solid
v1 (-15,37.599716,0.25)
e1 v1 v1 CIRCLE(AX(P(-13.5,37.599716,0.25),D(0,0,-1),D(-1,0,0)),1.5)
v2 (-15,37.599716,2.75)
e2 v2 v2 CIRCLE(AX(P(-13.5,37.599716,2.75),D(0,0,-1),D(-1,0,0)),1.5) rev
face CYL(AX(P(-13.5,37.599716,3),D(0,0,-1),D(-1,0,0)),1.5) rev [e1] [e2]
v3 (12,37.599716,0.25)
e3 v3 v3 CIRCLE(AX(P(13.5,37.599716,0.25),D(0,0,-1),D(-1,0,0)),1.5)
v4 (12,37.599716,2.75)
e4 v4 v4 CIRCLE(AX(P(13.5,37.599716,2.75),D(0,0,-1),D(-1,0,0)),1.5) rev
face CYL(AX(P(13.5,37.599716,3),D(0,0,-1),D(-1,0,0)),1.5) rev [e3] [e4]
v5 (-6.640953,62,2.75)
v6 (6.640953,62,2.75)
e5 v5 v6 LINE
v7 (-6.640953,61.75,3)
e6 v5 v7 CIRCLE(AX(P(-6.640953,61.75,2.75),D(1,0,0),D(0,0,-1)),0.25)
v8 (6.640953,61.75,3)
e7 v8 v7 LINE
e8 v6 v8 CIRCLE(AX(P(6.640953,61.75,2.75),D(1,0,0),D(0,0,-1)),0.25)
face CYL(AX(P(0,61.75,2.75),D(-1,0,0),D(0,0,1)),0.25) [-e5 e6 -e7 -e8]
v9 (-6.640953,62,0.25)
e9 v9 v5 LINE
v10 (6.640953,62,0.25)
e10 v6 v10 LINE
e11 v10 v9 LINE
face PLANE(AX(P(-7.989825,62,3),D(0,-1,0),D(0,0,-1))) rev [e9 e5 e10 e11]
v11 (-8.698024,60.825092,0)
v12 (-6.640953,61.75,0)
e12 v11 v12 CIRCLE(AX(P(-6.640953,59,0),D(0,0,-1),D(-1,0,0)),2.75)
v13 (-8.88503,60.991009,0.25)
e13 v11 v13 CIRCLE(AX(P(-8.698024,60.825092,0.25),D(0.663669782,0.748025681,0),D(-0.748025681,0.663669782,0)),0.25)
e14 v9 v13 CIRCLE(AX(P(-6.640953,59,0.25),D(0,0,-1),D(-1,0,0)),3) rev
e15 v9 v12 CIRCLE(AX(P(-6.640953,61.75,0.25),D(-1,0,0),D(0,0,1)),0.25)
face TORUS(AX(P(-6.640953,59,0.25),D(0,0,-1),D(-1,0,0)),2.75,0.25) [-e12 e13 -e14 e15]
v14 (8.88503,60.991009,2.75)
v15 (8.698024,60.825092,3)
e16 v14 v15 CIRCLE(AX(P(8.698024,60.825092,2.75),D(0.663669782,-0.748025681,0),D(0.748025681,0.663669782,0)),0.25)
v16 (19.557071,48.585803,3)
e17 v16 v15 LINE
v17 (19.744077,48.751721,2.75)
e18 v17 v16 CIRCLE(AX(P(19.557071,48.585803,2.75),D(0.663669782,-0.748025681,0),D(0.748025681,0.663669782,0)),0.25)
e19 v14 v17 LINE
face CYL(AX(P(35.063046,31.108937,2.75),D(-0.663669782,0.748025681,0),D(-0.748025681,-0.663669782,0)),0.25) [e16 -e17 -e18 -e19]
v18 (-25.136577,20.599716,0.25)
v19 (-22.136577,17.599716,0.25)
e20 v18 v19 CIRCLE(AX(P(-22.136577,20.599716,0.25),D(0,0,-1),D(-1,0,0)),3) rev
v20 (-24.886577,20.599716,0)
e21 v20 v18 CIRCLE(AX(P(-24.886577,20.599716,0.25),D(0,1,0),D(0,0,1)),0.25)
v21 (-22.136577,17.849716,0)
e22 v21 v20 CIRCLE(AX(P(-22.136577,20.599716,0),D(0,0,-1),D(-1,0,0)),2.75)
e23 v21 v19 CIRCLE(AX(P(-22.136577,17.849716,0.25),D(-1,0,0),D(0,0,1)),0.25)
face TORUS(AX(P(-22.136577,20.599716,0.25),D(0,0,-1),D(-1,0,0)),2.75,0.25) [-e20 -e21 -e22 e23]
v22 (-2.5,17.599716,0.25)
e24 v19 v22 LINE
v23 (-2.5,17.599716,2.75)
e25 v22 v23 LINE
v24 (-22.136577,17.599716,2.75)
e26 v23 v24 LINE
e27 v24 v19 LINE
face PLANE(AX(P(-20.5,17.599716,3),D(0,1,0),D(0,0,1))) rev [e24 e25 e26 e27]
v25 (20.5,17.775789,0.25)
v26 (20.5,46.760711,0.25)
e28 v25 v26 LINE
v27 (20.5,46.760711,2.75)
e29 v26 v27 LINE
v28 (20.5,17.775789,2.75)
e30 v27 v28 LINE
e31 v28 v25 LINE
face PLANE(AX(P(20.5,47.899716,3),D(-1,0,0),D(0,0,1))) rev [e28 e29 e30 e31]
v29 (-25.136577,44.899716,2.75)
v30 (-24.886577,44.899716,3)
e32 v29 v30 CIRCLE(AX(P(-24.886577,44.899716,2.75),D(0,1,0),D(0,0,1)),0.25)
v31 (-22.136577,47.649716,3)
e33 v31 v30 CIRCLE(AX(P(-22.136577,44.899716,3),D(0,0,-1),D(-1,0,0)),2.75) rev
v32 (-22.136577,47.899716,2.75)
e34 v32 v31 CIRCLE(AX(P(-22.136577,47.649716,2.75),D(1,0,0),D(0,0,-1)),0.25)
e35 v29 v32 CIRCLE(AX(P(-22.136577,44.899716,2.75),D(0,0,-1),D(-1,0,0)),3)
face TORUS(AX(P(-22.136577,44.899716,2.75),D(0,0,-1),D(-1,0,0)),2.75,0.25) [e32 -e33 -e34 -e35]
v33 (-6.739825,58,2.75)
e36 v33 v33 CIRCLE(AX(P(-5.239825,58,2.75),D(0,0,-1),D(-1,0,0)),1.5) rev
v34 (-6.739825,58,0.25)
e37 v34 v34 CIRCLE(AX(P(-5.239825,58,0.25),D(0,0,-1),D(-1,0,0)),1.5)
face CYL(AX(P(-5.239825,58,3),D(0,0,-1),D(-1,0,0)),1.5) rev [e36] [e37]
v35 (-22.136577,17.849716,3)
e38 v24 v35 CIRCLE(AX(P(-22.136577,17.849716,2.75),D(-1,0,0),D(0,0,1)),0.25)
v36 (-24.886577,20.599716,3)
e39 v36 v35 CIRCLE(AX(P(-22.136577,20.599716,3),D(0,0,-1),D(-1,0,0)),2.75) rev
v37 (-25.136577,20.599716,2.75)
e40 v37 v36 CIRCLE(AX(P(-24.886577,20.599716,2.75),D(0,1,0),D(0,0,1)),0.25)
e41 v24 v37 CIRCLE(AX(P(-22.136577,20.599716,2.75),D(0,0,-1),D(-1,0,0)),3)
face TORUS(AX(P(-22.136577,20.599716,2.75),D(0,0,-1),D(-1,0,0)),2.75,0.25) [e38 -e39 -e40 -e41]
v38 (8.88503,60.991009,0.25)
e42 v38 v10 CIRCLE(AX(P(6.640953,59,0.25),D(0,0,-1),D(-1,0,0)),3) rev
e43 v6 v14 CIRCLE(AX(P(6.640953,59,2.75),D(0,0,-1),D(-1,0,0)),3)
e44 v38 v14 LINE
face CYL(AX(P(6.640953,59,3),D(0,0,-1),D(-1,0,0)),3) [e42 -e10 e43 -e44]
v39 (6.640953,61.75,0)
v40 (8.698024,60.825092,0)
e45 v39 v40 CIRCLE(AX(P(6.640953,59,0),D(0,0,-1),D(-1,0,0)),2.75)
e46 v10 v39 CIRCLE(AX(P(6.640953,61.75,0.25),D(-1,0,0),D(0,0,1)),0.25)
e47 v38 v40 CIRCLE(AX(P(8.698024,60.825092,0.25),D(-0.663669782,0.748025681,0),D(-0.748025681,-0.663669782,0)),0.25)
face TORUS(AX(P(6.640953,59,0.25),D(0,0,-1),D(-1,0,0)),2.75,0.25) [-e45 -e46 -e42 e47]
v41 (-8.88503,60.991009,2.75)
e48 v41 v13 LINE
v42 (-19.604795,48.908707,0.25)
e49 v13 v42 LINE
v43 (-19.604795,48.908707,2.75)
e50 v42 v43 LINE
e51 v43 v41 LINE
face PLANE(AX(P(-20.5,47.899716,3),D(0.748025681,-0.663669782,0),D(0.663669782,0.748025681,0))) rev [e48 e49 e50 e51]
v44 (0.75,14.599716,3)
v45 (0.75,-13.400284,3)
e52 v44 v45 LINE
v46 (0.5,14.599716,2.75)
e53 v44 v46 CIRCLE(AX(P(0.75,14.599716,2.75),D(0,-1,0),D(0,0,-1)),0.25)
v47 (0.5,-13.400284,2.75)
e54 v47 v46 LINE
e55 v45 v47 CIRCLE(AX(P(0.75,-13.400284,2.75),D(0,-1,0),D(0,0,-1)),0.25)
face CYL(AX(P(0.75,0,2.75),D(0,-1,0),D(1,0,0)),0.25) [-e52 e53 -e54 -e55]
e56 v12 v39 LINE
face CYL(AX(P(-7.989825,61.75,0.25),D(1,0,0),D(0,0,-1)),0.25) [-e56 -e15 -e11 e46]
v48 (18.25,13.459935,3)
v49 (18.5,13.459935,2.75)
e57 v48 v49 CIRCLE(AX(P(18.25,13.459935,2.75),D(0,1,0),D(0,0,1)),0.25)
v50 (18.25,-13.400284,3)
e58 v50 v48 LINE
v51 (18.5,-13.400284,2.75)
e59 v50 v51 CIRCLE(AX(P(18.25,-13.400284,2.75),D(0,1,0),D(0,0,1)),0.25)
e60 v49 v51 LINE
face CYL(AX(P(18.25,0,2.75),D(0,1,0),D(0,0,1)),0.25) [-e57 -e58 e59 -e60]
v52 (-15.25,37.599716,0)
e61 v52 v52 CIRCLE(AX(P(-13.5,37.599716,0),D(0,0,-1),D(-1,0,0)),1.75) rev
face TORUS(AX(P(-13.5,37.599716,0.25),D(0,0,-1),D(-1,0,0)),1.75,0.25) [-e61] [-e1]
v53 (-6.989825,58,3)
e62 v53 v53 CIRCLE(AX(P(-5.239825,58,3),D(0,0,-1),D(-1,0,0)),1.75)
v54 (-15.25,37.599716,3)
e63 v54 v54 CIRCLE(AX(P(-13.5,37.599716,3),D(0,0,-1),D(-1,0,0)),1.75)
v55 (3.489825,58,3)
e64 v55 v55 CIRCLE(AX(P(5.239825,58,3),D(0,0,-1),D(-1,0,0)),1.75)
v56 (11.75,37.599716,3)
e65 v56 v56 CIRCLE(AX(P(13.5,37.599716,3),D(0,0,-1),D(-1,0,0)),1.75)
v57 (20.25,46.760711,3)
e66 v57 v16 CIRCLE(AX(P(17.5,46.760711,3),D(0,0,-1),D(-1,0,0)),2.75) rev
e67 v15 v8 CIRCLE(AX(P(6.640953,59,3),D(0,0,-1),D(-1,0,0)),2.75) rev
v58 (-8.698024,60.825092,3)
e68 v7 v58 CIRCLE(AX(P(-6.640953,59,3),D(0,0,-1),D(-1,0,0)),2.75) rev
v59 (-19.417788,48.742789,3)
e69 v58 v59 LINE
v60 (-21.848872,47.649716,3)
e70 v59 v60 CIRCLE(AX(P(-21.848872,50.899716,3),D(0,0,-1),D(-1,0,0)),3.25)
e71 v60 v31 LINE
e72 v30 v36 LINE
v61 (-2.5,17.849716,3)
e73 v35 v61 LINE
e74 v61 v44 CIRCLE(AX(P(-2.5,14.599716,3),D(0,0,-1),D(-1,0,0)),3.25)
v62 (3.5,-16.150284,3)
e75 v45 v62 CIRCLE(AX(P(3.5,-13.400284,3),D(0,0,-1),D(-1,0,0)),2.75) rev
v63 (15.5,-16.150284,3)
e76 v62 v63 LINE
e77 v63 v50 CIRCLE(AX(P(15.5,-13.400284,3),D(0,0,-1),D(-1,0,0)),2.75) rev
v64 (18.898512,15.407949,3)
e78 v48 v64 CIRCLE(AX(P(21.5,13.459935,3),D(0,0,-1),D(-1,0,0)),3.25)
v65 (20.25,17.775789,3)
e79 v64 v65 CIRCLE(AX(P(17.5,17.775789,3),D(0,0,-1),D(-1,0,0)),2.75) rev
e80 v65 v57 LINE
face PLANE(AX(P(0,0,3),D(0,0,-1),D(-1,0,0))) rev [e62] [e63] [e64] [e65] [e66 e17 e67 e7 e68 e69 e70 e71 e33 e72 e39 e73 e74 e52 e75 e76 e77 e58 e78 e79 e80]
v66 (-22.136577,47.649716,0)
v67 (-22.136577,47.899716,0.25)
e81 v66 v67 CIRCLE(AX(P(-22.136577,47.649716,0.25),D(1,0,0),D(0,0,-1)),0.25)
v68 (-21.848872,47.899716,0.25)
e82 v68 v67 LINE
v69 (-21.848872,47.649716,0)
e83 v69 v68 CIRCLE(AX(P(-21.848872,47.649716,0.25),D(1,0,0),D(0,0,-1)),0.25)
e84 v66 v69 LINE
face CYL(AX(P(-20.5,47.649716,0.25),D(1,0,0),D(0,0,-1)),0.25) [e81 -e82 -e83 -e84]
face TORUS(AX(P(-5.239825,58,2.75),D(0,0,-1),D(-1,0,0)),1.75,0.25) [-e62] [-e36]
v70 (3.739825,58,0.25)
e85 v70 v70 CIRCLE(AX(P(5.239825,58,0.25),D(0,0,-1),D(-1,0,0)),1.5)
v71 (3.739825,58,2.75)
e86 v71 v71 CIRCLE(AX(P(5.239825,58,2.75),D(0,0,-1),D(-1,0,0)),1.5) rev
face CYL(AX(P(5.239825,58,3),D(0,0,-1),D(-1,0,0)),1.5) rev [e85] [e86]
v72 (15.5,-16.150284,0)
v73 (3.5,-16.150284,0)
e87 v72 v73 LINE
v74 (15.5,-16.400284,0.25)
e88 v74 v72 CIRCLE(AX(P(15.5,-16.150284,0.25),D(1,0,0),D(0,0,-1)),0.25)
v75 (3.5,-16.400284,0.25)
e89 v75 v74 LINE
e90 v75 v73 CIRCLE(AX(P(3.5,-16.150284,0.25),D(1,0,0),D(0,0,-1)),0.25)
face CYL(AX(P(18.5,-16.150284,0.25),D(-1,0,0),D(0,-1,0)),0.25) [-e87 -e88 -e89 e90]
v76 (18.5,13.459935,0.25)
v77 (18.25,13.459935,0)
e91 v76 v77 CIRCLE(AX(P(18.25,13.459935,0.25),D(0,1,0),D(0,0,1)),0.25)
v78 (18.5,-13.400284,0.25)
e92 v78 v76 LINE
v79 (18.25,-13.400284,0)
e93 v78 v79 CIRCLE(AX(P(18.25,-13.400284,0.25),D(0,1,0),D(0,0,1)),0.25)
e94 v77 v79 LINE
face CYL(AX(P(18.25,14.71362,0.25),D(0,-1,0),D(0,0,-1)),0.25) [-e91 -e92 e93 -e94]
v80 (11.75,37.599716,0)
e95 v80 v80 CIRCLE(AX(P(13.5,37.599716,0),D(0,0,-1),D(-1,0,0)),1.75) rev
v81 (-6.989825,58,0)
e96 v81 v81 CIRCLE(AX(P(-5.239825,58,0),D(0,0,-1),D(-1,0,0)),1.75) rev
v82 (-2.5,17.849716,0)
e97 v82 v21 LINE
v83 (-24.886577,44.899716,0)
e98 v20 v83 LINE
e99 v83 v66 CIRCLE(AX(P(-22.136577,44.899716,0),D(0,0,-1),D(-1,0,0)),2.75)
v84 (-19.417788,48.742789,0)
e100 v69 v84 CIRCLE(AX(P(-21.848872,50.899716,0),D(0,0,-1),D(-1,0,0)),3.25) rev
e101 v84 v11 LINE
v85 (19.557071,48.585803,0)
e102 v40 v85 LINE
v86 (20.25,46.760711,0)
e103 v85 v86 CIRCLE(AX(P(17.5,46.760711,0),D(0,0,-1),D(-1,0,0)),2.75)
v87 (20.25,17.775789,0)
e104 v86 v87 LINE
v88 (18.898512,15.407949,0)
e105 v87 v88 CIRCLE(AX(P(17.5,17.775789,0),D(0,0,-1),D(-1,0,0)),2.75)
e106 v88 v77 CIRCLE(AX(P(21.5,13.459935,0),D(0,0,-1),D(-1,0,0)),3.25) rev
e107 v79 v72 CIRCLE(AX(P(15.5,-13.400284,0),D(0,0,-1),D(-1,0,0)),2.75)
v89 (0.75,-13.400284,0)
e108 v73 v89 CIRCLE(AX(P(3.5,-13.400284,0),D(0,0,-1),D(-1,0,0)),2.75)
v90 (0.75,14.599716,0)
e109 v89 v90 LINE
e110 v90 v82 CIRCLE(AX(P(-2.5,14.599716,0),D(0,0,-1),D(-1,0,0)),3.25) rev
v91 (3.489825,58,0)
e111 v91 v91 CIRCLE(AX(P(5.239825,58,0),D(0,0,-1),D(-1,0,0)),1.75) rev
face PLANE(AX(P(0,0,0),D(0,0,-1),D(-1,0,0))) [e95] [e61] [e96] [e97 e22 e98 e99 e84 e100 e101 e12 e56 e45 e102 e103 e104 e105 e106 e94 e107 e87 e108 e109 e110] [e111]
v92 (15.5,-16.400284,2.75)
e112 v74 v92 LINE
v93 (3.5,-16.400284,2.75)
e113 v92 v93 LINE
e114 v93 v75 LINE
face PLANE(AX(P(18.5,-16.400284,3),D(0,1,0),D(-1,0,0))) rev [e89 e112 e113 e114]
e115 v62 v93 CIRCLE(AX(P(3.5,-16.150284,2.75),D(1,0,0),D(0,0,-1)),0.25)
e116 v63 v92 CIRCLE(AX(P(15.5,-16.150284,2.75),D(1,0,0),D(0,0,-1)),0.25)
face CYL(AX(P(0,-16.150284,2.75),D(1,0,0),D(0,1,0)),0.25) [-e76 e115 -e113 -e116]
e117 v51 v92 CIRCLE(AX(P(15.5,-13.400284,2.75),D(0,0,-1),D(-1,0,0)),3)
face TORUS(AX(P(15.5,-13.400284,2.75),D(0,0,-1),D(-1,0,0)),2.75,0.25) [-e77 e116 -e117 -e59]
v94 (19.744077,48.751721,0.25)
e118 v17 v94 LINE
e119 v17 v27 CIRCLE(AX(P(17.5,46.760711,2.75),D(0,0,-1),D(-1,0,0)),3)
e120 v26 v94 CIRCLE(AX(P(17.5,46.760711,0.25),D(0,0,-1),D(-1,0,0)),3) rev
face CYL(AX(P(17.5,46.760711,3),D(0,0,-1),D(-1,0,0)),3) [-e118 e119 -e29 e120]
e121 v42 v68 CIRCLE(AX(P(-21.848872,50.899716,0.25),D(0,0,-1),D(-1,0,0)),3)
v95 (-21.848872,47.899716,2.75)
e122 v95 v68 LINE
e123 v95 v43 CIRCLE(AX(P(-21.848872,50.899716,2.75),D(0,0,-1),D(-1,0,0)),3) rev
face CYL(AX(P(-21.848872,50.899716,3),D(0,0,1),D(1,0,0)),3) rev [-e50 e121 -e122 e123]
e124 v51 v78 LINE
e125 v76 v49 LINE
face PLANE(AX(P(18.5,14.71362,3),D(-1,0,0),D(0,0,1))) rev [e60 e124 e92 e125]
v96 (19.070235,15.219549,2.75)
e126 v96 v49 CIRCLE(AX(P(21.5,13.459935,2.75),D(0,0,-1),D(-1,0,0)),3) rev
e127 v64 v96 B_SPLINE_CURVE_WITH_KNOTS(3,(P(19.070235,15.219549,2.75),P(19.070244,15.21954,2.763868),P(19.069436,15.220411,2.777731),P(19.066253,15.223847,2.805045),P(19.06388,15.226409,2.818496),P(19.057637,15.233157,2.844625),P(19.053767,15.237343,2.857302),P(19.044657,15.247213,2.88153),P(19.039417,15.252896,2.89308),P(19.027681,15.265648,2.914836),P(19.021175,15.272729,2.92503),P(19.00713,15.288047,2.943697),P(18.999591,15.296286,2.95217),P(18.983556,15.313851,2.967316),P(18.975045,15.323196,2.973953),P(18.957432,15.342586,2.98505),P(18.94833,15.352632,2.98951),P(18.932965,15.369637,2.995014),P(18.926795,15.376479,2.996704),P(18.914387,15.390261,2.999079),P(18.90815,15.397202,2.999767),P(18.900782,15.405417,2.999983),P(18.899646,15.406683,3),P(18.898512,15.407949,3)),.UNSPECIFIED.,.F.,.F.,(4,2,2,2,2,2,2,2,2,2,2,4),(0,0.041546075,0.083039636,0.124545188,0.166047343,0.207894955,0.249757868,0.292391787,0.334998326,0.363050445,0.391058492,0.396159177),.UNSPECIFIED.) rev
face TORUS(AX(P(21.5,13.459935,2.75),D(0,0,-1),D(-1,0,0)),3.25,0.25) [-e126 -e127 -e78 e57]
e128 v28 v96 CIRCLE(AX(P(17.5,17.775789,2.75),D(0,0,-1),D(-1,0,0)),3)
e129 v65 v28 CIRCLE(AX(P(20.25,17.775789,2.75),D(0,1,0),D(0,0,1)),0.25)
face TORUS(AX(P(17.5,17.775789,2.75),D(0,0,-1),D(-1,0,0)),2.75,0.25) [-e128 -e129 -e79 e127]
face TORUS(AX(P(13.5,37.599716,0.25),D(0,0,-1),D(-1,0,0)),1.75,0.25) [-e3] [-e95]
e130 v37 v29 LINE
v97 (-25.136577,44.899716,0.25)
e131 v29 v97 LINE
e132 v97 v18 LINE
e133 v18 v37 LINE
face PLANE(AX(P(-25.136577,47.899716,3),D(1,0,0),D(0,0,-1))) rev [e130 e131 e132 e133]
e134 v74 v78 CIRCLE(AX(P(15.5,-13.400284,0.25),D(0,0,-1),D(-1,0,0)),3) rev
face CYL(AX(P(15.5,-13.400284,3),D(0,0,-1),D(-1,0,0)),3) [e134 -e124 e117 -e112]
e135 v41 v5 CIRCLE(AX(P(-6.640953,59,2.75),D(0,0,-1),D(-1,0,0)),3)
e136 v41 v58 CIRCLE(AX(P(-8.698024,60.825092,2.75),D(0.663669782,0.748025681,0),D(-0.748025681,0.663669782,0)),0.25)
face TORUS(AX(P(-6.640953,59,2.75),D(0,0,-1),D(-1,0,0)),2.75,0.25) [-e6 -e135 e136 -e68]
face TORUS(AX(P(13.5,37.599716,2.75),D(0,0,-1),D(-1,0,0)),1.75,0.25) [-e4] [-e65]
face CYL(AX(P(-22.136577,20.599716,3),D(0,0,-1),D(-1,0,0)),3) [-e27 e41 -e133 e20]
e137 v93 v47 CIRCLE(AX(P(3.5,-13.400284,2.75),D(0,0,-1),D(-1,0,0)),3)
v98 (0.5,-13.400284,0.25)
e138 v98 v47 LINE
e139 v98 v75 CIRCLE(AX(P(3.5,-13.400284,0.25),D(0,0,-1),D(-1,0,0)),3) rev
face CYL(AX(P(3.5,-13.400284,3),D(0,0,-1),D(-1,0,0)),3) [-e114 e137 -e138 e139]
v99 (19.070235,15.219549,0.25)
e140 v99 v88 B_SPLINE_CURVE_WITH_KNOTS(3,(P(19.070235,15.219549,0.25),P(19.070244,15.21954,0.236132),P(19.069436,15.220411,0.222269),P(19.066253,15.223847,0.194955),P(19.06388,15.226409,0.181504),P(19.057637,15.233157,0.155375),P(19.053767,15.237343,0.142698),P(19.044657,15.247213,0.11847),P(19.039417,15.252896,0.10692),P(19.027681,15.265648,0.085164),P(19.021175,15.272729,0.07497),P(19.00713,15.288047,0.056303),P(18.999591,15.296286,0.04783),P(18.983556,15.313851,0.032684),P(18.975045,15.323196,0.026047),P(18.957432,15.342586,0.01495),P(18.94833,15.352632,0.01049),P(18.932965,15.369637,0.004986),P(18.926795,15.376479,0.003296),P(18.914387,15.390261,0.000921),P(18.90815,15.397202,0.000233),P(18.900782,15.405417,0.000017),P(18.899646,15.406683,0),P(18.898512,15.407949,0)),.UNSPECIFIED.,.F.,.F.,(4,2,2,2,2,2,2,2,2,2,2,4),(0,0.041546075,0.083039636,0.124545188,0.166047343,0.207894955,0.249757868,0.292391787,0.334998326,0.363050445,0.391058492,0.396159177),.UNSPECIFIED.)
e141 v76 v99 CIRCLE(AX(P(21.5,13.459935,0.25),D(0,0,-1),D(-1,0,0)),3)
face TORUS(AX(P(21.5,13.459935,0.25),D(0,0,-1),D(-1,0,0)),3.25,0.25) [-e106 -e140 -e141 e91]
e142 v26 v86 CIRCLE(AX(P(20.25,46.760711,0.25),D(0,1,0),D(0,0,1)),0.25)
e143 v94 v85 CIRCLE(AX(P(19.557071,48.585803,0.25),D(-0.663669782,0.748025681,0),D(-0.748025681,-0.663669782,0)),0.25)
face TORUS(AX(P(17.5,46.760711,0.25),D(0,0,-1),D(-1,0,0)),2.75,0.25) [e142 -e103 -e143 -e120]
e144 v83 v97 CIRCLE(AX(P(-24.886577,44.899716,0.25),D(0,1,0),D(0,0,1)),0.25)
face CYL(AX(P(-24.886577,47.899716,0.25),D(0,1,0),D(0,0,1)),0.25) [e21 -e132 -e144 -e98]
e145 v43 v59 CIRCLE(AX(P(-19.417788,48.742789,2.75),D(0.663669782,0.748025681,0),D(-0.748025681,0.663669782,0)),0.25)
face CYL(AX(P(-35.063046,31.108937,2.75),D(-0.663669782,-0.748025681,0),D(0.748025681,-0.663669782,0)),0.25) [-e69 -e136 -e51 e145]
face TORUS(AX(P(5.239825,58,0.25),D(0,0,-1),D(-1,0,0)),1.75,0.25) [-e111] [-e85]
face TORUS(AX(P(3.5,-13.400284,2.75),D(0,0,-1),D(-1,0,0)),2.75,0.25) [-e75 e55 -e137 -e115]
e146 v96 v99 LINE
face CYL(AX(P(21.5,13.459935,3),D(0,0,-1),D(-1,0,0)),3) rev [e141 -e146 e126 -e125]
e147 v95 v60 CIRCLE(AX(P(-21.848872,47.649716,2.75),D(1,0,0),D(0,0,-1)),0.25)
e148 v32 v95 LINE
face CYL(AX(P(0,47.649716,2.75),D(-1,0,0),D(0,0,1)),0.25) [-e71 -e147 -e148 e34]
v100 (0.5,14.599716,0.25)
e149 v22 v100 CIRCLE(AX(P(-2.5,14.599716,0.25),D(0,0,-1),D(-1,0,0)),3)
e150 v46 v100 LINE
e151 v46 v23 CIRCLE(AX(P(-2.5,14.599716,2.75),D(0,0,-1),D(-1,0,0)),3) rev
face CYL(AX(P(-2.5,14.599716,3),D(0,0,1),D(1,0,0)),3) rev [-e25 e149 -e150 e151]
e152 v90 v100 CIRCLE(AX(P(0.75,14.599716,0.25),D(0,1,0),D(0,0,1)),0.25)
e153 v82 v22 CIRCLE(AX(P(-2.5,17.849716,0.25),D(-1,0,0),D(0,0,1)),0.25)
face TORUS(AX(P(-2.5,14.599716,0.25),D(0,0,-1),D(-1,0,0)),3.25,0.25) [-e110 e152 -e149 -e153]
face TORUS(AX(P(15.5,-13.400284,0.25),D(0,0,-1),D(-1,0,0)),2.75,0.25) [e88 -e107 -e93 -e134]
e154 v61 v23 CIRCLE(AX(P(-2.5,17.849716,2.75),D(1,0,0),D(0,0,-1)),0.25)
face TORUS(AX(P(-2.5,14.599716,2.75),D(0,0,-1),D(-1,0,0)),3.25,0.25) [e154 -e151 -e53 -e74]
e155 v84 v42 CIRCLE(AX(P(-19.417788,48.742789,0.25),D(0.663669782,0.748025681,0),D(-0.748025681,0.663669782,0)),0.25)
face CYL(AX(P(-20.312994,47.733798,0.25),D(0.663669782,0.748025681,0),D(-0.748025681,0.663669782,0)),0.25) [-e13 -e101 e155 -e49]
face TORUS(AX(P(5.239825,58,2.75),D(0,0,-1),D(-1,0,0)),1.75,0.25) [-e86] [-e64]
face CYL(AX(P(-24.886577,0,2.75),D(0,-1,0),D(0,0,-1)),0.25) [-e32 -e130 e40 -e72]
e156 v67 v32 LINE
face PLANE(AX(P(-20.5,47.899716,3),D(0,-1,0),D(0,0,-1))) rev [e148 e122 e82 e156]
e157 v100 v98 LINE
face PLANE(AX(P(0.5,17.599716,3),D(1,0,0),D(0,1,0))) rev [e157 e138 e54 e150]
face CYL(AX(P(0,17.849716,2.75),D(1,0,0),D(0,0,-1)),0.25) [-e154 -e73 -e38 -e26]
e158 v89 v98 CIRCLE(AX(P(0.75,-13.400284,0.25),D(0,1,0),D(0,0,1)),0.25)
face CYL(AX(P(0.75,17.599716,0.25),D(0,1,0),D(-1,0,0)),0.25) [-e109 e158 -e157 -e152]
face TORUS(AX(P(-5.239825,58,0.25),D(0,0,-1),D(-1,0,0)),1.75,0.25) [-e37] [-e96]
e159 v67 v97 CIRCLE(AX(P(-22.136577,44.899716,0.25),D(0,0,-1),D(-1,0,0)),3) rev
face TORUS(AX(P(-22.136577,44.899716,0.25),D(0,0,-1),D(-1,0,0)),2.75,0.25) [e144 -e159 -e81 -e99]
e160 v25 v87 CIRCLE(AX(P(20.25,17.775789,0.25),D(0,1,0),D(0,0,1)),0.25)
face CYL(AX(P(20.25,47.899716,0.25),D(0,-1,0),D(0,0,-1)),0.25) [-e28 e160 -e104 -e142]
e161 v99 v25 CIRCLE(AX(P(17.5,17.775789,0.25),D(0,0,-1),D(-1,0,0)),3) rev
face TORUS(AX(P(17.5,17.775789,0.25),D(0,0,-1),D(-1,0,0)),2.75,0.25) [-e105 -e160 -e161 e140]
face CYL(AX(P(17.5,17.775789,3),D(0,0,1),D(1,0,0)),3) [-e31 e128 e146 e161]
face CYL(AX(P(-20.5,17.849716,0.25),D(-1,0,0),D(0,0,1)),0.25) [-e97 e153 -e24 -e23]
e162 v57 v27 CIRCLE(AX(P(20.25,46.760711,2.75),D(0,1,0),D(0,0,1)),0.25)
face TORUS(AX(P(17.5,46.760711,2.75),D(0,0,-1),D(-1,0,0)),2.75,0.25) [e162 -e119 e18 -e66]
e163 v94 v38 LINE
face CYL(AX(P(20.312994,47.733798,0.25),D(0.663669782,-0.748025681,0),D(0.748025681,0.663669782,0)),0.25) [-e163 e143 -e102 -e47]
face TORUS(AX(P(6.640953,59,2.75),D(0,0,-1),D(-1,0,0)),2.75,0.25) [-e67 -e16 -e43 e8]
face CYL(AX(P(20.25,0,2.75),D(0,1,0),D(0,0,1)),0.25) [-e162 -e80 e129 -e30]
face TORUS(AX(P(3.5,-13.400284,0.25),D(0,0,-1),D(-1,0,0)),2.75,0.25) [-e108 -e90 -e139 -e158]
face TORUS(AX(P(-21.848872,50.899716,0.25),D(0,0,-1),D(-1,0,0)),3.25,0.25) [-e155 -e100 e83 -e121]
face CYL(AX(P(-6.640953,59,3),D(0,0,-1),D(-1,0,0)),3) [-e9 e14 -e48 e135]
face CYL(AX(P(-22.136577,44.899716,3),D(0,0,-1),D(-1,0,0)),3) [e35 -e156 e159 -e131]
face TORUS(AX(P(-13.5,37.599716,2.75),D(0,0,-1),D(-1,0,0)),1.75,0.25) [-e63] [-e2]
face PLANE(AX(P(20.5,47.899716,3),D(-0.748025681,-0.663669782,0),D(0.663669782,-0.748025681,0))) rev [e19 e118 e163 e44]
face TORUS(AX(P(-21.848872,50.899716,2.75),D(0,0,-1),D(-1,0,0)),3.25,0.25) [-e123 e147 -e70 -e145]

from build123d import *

# Parameters (mm, degrees)
SKETCH1_R           = 1.5
BOSS_EXTRUDE1_DEPTH = 3
FILLET1_R           = 3
FILLET2_R           = 0.25


with BuildPart() as part:
    # Sketch1 → Boss-Extrude1 (new body)
    with BuildSketch(Plane.XY):
        Polygon((-20.5, 47.899715907), (-7.989824602, 62), (7.989824602, 62), (20.5, 47.899715907), (20.5, 15.219549054), (19.070234775, 15.219549054), (18.5, 14.713620449), (18.5, -16.400284093), (0.5, -16.400284093), (0.5, 17.599715907), (-20.5, 17.599715907), (-25.136576575, 17.599715907), (-25.136576575, 47.899715907), align=None)
        with Locations((-5.239824602, 58)):
            Circle(SKETCH1_R, mode=Mode.SUBTRACT)
        with Locations((-13.5, 37.599715907)):
            Circle(SKETCH1_R, mode=Mode.SUBTRACT)
        with Locations(Location((13.5, 37.599715907, 0), (0, 0, 180))):
            Circle(SKETCH1_R, mode=Mode.SUBTRACT)
        with Locations(Location((5.239824602, 58, 0), (0, 0, 180))):
            Circle(SKETCH1_R, mode=Mode.SUBTRACT)
    extrude(amount=BOSS_EXTRUDE1_DEPTH)

    # Fillet1
    # the kernel refuses this fillet: 3 mm, written as the material it adds along each edge
    with BuildSketch(Plane(origin=(0.5, 17.599715907, 0), x_dir=(-1, 0, 0), z_dir=(0, 0, 1))) as fillet1_piece_1:
        with BuildLine():
            CenterArc((FILLET1_R, FILLET1_R), FILLET1_R, 180, 90)
            Line((0, FILLET1_R), (-FILLET1_R * 0.02, FILLET1_R))
            Line((-FILLET1_R * 0.02, FILLET1_R), (-FILLET1_R * 0.02, -FILLET1_R * 0.02))
            Line((-FILLET1_R * 0.02, -FILLET1_R * 0.02), (FILLET1_R, -FILLET1_R * 0.02))
            Line((FILLET1_R, -FILLET1_R * 0.02), (FILLET1_R, 0))
        make_face()
    extrude(amount=3)
    with BuildSketch(Plane(origin=(-20.5, 47.899715907, 0), x_dir=(0.6636697823920836, 0.7480256813369742, 0), z_dir=(0, 0, 1))) as fillet1_piece_2:
        with BuildLine():
            CenterArc((FILLET1_R * 0.449623891264, FILLET1_R), FILLET1_R, 221.580355478, 48.419644522)
            Line((-FILLET1_R * 0.298401790073, FILLET1_R * 0.336330217608), (-FILLET1_R * 0.3133623037, FILLET1_R * 0.32305682196))
            Line((-FILLET1_R * 0.3133623037, FILLET1_R * 0.32305682196), (-FILLET1_R * 0.00899247782528, -FILLET1_R * 0.02))
            Line((-FILLET1_R * 0.00899247782528, -FILLET1_R * 0.02), (FILLET1_R * 0.449623891264, -FILLET1_R * 0.02))
            Line((FILLET1_R * 0.449623891264, -FILLET1_R * 0.02), (FILLET1_R * 0.449623891264, 0))
        make_face()
    extrude(amount=3)
    with BuildSketch(Plane(origin=(18.5, 14.713620449, 0), x_dir=(0, -1, 0), z_dir=(0, 0, 1))) as fillet1_piece_3:
        with BuildLine():
            CenterArc((1.25368526, 3), FILLET1_R, 234.088286061, 35.911713939)
            Line((-0.505928605, 0.570234775), (-0.541120882, 0.521639471))
            ThreePointArc((-0.541120882, 0.521639471), (-0.297845843, 0.245297201), (-0.044881541, -0.039820187))
            Line((-0.044881541, -0.039820187), (0, -0.06))
            Line((0, -0.06), (1.25368526, -0.06))
            Line((1.25368526, -0.06), (1.25368526, 0))
        make_face()
    extrude(amount=3)
    # the kernel refuses this fillet: 3 mm, written as the material it takes off along each edge
    with BuildSketch(Plane(origin=(-7.989824602, 62, -3.372179184), x_dir=(1, 0, 0), z_dir=(0, 0, 1)), Plane(origin=(7.989824602, 62, -3.372179184), x_dir=(0.6636697823920855, -0.7480256813369726, 0), z_dir=(0, 0, 1))) as fillet1_2_piece_1:
        with BuildLine():
            CenterArc((FILLET1_R * 0.449623891264, -FILLET1_R), FILLET1_R, 90, 48.419644522)
            Line((-FILLET1_R * 0.298401790073, -FILLET1_R * 0.336330217608), (-FILLET1_R * 0.3133623037, -FILLET1_R * 0.32305682196))
            Line((-FILLET1_R * 0.3133623037, -FILLET1_R * 0.32305682196), (-FILLET1_R * 0.00899247782527, FILLET1_R * 0.02))
            Line((-FILLET1_R * 0.00899247782527, FILLET1_R * 0.02), (FILLET1_R * 0.449623891264, FILLET1_R * 0.02))
            Line((FILLET1_R * 0.449623891264, FILLET1_R * 0.02), (FILLET1_R * 0.449623891264, 0))
        make_face()
    extrude(amount=9.744358369, mode=Mode.SUBTRACT)
    with BuildSketch(Plane(origin=(18.5, -16.400284093, -7.5), x_dir=(-1, 0, 0), z_dir=(0, 0, 1)), Plane(origin=(0.5, -16.400284093, -7.5), x_dir=(0, 1, 0), z_dir=(0, 0, 1)), Plane(origin=(-25.136576575, 17.599715907, -7.5), x_dir=(0, 1, 0), z_dir=(0, 0, 1)), Plane(origin=(-25.136576575, 47.899715907, -7.5), x_dir=(1, 0, 0), z_dir=(0, 0, 1))) as fillet1_2_piece_2:
        with BuildLine():
            CenterArc((FILLET1_R, -FILLET1_R), FILLET1_R, 90, 90)
            Line((0, -FILLET1_R), (-FILLET1_R * 0.02, -FILLET1_R))
            Line((-FILLET1_R * 0.02, -FILLET1_R), (-FILLET1_R * 0.02, FILLET1_R * 0.02))
            Line((-FILLET1_R * 0.02, FILLET1_R * 0.02), (FILLET1_R, FILLET1_R * 0.02))
            Line((FILLET1_R, FILLET1_R * 0.02), (FILLET1_R, 0))
        make_face()
    extrude(amount=18, mode=Mode.SUBTRACT)
    with BuildSketch(Plane(origin=(20.5, 47.899715907, -2.847511579), x_dir=(0, -1, 0), z_dir=(0, 0, 1))) as fillet1_2_piece_3:
        with BuildLine():
            CenterArc((FILLET1_R * 0.379668210529, -FILLET1_R), FILLET1_R, 90, 41.580355478)
            Line((-FILLET1_R * 0.284001571863, -FILLET1_R * 0.251974318663), (-FILLET1_R * 0.297274967511, -FILLET1_R * 0.237013805036))
            Line((-FILLET1_R * 0.297274967511, -FILLET1_R * 0.237013805036), (-FILLET1_R * 0.00759336421058, FILLET1_R * 0.02))
            Line((-FILLET1_R * 0.00759336421058, FILLET1_R * 0.02), (FILLET1_R * 0.379668210529, FILLET1_R * 0.02))
            Line((FILLET1_R * 0.379668210529, FILLET1_R * 0.02), (FILLET1_R * 0.379668210529, 0))
        make_face()
    extrude(amount=8.695023158, mode=Mode.SUBTRACT)
    with BuildSketch(Plane(origin=(20.5, 15.219549054, -6.390599908), x_dir=(-1, 0, 0), z_dir=(0, 0, 1))) as fillet1_2_piece_4:
        with BuildLine():
            CenterArc((3, -2.556239963), FILLET1_R, 121.561373817, 58.438626183)
            Line((0, -2.556239963), (-0.06, -2.556239963))
            Line((-0.06, -2.556239963), (-0.06, 0))
            Line((-0.06, 0), (0, 0.06))
            ThreePointArc((0, 0.06), (0.714882612, 0.06), (1.398360529, 0.051124799))
            Line((1.398360529, 0.051124799), (1.429765225, 0))
        make_face()
    extrude(amount=15.781199817, mode=Mode.SUBTRACT)

    # Fillet2
    fillet2_edges = [part.edges().sort_by_distance(p)[0] for p in [
        (-6.739824602, 58, 0),
        (-6.739824602, 58, 3),
        (-15, 37.599715907, 0),
        (-15, 37.599715907, 3),
        (15, 37.599715907, 0),
        (15, 37.599715907, 3),
        (6.739824602, 58, 0),
        (6.739824602, 58, 3),
        (0, 62, 0),
        (0, 62, 3),
        (18.5, 0.029825548, 0),
        (9.5, -16.400284093, 0),
        (0.5, 0.599715907, 0),
        (-12.318288288, 17.599715907, 0),
        (-25.136576575, 32.749715907, 0),
        (-21.992724125, 47.899715907, 0),
        (-14.244912301, 54.949857953, 0),
        (14.314553508, 54.871364985, 0),
        (20.5, 32.268250146, 0),
        (-7.871191108, 61.736149488, 0),
        (-24.257896919, 47.02103625, 0),
        (-24.257896919, 18.478395563, 0),
        (1.378679656, -15.521604437, 0),
        (17.621320344, -15.521604437, 0),
        (20.118272744, 16.311327397, 0),
        (20.304659617, 47.825551373, 0),
        (7.871191108, 61.736149488, 0),
        (14.314553508, 54.871364985, 3),
        (18.5, 0.029825548, 3),
        (20.5, 32.268250146, 3),
        (-14.244912301, 54.949857953, 3),
        (-21.992724125, 47.899715907, 3),
        (-25.136576575, 32.749715907, 3),
        (-12.318288288, 17.599715907, 3),
        (0.5, 0.599715907, 3),
        (9.5, -16.400284093, 3),
        (-7.871191108, 61.736149488, 3),
        (-24.257896919, 47.02103625, 3),
        (-24.257896919, 18.478395563, 3),
        (1.378679656, -15.521604437, 3),
        (17.621320344, -15.521604437, 3),
        (20.118272744, 16.311327397, 3),
        (20.304659617, 47.825551373, 3),
        (7.871191108, 61.736149488, 3),
        (18.64611706, 14.384787698, 0),
        (18.64611706, 14.384787698, 3),
        (-0.378679656, 16.72103625, 0),
        (-0.378679656, 16.72103625, 3),
        (-20.618633494, 48.163566419, 0),
        (-20.618633494, 48.163566419, 3),
    ]]
    fillet(fillet2_edges, radius=FILLET2_R)


solid = part.part
